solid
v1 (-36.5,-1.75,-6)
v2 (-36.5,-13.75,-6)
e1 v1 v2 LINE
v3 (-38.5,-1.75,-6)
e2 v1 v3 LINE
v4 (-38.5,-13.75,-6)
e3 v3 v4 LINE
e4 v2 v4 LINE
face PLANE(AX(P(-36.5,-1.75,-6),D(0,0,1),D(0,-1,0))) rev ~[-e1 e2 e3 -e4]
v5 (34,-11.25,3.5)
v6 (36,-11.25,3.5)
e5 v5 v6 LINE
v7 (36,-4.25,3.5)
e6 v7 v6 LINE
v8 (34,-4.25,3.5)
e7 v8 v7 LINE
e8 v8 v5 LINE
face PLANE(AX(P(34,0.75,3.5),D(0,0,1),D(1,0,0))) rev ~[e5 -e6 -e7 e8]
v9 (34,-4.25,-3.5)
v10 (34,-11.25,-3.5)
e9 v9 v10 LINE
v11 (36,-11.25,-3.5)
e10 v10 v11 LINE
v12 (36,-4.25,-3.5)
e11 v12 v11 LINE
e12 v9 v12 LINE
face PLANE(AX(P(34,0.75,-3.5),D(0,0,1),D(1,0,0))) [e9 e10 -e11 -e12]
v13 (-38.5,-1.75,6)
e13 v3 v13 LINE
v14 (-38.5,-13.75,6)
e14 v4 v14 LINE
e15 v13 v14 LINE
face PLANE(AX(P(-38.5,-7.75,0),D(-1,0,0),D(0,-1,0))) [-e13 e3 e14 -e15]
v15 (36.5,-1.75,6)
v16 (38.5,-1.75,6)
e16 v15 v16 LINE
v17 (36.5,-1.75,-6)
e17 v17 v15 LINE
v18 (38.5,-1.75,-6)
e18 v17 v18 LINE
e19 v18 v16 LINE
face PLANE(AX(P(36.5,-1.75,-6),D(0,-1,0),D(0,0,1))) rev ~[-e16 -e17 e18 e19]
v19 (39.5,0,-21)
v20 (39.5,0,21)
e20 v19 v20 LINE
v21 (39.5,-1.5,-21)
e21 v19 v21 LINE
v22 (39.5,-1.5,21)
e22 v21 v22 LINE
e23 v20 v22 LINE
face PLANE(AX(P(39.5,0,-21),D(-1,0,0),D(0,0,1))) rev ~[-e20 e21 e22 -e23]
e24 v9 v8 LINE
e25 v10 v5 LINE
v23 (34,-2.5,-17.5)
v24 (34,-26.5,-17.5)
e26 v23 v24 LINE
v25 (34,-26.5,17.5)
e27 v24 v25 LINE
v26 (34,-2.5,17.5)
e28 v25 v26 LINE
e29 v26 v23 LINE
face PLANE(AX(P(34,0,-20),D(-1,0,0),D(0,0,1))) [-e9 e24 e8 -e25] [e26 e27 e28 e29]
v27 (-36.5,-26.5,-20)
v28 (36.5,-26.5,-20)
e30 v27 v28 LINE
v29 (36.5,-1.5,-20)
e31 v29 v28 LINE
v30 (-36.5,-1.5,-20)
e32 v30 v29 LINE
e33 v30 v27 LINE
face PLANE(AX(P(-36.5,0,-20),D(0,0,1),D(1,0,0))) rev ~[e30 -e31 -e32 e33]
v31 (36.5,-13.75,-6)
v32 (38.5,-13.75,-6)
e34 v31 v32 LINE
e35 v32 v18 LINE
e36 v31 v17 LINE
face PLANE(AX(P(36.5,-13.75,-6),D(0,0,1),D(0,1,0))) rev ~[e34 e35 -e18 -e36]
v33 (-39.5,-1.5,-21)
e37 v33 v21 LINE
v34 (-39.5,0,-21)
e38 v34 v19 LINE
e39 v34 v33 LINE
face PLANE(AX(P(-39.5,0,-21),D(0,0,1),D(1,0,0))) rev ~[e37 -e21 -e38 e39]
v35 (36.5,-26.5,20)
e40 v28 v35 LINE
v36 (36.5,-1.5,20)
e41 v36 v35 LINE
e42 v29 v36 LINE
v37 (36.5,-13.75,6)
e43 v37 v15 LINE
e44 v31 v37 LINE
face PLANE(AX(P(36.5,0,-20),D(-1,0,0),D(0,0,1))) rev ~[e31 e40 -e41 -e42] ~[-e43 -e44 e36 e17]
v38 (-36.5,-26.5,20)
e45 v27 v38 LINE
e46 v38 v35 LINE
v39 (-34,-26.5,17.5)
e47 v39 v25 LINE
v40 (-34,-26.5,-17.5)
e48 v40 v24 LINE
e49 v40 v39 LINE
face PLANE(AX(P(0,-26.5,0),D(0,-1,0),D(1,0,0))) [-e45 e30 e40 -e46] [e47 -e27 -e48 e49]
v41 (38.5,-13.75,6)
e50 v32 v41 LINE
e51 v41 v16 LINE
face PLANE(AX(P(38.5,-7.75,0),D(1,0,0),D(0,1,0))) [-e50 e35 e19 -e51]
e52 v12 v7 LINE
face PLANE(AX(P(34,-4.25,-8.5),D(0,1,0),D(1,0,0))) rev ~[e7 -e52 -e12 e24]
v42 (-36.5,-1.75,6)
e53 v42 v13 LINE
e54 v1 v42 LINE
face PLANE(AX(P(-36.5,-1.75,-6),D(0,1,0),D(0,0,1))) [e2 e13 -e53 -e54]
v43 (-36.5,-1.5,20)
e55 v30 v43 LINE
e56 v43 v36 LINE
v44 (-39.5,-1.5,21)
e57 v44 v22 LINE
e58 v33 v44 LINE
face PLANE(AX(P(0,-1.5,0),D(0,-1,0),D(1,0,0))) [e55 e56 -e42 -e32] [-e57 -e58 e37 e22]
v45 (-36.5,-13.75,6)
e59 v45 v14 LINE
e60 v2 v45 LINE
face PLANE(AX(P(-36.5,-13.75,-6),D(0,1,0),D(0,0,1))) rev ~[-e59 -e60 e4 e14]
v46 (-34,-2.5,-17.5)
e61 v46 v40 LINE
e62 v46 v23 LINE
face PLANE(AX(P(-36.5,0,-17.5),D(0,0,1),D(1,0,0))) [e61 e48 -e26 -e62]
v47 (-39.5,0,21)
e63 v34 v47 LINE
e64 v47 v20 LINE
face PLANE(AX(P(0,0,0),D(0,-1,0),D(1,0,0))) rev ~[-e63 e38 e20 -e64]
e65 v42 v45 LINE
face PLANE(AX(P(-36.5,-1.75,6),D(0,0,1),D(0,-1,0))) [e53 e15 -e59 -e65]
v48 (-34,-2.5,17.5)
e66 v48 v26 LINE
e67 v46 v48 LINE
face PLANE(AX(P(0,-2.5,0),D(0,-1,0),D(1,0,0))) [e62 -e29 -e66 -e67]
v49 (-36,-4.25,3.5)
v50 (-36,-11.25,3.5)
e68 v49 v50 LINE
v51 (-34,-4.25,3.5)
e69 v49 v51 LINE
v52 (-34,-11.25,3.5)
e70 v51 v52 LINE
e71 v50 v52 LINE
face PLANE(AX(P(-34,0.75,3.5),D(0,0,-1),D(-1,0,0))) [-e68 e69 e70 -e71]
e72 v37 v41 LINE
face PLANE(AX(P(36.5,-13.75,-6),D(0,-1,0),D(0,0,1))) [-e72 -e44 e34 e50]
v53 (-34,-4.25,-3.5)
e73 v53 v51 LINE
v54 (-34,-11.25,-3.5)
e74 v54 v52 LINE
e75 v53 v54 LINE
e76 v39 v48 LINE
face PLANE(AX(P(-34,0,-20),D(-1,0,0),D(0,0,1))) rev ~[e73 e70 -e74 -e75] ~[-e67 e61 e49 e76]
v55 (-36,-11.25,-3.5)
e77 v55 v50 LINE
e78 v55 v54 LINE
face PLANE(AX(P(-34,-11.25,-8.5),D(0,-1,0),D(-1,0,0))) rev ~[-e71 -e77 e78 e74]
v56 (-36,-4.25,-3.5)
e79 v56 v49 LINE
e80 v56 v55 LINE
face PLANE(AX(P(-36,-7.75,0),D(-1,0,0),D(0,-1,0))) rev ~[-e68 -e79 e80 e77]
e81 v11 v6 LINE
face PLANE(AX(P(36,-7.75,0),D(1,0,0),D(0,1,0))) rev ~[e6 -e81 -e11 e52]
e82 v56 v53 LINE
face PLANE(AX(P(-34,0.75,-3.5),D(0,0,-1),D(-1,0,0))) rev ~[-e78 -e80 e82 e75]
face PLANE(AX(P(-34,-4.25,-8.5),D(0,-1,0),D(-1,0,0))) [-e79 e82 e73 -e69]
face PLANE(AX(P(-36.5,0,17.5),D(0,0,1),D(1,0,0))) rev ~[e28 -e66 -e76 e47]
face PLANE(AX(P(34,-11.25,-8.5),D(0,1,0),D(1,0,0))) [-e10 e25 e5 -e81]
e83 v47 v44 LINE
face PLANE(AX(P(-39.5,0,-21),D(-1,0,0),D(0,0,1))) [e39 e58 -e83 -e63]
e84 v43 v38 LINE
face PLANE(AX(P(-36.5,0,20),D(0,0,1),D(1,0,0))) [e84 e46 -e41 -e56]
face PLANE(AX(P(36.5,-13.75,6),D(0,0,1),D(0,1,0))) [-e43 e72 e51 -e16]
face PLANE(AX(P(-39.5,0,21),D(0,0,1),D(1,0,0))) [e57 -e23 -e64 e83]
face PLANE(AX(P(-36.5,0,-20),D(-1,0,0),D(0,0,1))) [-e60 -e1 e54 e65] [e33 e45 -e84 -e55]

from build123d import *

# Parameters (mm, degrees)
F0_W        = 73
F0_H        = 40
F1_DEPTH    = 26.5
F0_W_2      = 79
F0_H_2      = 42
F2_DEPTH    = 1.5
F3_W        = 12
F3_H        = 12
F4_DEPTH    = 2
F5_W        = 12
F5_H        = 12
F6_DEPTH    = 2
F7_T        = 2.5
F7_T3_DEPTH = 78
F7_T5_DEPTH = 45
F7_T7_DEPTH = 17
F7_T9_DEPTH = 17


# Not quite as in the source:
# - a shell that OpenCascade refuses in one call is made with other operations: the cavity is built on its own and cut out


with BuildPart() as f1:
    # F0 (on Front) → F1 (new body)
    with BuildSketch(Plane.XZ):
        Rectangle(F0_W, F0_H)
    extrude(amount=F1_DEPTH)

    # F0 (on Front) → F2 (join)
    with BuildSketch(Plane.XZ):
        Rectangle(F0_W_2, F0_H_2)
        Rectangle(F0_W, F0_H, mode=Mode.SUBTRACT)
    extrude(amount=F2_DEPTH)

    # F3 (on face) → F4 (join)
    with BuildSketch(Plane(origin=(-36.5, 0, 0), x_dir=(0, -1, 0), z_dir=(-1, 0, 0))):
        with Locations((7.75, 0)):
            Rectangle(F3_W, F3_H)
    extrude(amount=F4_DEPTH)

    # F5 (on face) → F6 (join)
    with BuildSketch(Plane.YZ.offset(36.5)):
        with Locations((-7.75, 0)):
            Rectangle(F5_W, F5_H)
    extrude(amount=F6_DEPTH)

    # F7: shell of thickness 2.5, made by hand


with BuildPart() as f7_core1:
    # F7_t2: copy of F1
    add(f1.part)

    # the walls: a layer under each face that stays
    f7_faces = [f7_core1.faces().sort_by_distance(p)[0] for p in [
        (0, -14, -20),
        (-36.8666666667, -1.5, -19.6),
        (36.5, -14, 0),
        (-36.5, -14, 0),
        (0, -0.75, -21),
        (39.5, -0.75, 0),
        (0, -0.75, 21),
        (-39.5, -0.75, 0),
        (0, -14, 20),
        (37.5, -13.75, 0),
        (37.5, -7.75, 6),
        (37.5, -1.75, 0),
        (37.5, -7.75, -6),
        (-37.5, -1.75, 0),
        (-37.5, -7.75, 6),
        (-37.5, -13.75, 0),
        (-37.5, -7.75, -6),
        (0, 0, 0),
        (38.5, -7.75, 0),
        (-38.5, -7.75, 0),
    ]]
    thicken(f7_faces, amount=-F7_T, mode=Mode.SUBTRACT)

    # F7_s4 → F7_t3 (cut)
    with BuildSketch(Plane.YZ.offset(-39)):
        Polygon((-1.525, -20.025), (-1.5, -17.5), (1, -17.5), (1, -20), align=None)
        Polygon((-1.525, 20.025), (1, 20), (1, 17.5), (-1.5, 17.5), align=None)
    extrude(amount=F7_T3_DEPTH, mode=Mode.SUBTRACT)

    # F7_s6 → F7_t5 (cut)
    with BuildSketch(Plane.XY.offset(-22.5)):
        Polygon((36.525, -1.525), (36.5, 1), (34, 1), (34, -1.5), align=None)
        Polygon((-36.525, -1.525), (-36.5, 1), (-34, 1), (-34, -1.5), align=None)
    extrude(amount=F7_T5_DEPTH, mode=Mode.SUBTRACT)

    # F7_s8 → F7_t7 (cut)
    with BuildSketch(Plane.XY.offset(-8.5)):
        Polygon((36.525, -13.775), (34, -13.75), (34, -11.25), (36.5, -11.25), align=None)
        Polygon((36.525, -1.725), (34, -1.75), (34, -4.25), (36.5, -4.25), align=None)
        Polygon((-36.525, -1.725), (-34, -1.75), (-34, -4.25), (-36.5, -4.25), align=None)
        Polygon((-36.525, -13.775), (-34, -13.75), (-34, -11.25), (-36.5, -11.25), align=None)
    extrude(amount=F7_T7_DEPTH, mode=Mode.SUBTRACT)

    # F7_s10 → F7_t9 (cut)
    with BuildSketch(Plane.XZ.offset(-0.75)):
        Polygon((36.525, 6.025), (34, 6), (34, 3.5), (36.5, 3.5), align=None)
        Polygon((36.525, -6.025), (34, -6), (34, -3.5), (36.5, -3.5), align=None)
        Polygon((-36.525, 6.025), (-34, 6), (-34, 3.5), (-36.5, 3.5), align=None)
        Polygon((-36.525, -6.025), (-34, -6), (-34, -3.5), (-36.5, -3.5), align=None)
    extrude(amount=F7_T9_DEPTH, mode=Mode.SUBTRACT)


with BuildPart() as f1_1:
    add(f1.part)

    # what is left inside the walls is the cavity
    f7_cavity = [f7_core1.part.solids().sort_by_distance(p)[0] for p in [
        (0, -2.525, -5.833333),
    ]]
    add(f7_cavity, mode=Mode.SUBTRACT)


solid = f1_1.part
